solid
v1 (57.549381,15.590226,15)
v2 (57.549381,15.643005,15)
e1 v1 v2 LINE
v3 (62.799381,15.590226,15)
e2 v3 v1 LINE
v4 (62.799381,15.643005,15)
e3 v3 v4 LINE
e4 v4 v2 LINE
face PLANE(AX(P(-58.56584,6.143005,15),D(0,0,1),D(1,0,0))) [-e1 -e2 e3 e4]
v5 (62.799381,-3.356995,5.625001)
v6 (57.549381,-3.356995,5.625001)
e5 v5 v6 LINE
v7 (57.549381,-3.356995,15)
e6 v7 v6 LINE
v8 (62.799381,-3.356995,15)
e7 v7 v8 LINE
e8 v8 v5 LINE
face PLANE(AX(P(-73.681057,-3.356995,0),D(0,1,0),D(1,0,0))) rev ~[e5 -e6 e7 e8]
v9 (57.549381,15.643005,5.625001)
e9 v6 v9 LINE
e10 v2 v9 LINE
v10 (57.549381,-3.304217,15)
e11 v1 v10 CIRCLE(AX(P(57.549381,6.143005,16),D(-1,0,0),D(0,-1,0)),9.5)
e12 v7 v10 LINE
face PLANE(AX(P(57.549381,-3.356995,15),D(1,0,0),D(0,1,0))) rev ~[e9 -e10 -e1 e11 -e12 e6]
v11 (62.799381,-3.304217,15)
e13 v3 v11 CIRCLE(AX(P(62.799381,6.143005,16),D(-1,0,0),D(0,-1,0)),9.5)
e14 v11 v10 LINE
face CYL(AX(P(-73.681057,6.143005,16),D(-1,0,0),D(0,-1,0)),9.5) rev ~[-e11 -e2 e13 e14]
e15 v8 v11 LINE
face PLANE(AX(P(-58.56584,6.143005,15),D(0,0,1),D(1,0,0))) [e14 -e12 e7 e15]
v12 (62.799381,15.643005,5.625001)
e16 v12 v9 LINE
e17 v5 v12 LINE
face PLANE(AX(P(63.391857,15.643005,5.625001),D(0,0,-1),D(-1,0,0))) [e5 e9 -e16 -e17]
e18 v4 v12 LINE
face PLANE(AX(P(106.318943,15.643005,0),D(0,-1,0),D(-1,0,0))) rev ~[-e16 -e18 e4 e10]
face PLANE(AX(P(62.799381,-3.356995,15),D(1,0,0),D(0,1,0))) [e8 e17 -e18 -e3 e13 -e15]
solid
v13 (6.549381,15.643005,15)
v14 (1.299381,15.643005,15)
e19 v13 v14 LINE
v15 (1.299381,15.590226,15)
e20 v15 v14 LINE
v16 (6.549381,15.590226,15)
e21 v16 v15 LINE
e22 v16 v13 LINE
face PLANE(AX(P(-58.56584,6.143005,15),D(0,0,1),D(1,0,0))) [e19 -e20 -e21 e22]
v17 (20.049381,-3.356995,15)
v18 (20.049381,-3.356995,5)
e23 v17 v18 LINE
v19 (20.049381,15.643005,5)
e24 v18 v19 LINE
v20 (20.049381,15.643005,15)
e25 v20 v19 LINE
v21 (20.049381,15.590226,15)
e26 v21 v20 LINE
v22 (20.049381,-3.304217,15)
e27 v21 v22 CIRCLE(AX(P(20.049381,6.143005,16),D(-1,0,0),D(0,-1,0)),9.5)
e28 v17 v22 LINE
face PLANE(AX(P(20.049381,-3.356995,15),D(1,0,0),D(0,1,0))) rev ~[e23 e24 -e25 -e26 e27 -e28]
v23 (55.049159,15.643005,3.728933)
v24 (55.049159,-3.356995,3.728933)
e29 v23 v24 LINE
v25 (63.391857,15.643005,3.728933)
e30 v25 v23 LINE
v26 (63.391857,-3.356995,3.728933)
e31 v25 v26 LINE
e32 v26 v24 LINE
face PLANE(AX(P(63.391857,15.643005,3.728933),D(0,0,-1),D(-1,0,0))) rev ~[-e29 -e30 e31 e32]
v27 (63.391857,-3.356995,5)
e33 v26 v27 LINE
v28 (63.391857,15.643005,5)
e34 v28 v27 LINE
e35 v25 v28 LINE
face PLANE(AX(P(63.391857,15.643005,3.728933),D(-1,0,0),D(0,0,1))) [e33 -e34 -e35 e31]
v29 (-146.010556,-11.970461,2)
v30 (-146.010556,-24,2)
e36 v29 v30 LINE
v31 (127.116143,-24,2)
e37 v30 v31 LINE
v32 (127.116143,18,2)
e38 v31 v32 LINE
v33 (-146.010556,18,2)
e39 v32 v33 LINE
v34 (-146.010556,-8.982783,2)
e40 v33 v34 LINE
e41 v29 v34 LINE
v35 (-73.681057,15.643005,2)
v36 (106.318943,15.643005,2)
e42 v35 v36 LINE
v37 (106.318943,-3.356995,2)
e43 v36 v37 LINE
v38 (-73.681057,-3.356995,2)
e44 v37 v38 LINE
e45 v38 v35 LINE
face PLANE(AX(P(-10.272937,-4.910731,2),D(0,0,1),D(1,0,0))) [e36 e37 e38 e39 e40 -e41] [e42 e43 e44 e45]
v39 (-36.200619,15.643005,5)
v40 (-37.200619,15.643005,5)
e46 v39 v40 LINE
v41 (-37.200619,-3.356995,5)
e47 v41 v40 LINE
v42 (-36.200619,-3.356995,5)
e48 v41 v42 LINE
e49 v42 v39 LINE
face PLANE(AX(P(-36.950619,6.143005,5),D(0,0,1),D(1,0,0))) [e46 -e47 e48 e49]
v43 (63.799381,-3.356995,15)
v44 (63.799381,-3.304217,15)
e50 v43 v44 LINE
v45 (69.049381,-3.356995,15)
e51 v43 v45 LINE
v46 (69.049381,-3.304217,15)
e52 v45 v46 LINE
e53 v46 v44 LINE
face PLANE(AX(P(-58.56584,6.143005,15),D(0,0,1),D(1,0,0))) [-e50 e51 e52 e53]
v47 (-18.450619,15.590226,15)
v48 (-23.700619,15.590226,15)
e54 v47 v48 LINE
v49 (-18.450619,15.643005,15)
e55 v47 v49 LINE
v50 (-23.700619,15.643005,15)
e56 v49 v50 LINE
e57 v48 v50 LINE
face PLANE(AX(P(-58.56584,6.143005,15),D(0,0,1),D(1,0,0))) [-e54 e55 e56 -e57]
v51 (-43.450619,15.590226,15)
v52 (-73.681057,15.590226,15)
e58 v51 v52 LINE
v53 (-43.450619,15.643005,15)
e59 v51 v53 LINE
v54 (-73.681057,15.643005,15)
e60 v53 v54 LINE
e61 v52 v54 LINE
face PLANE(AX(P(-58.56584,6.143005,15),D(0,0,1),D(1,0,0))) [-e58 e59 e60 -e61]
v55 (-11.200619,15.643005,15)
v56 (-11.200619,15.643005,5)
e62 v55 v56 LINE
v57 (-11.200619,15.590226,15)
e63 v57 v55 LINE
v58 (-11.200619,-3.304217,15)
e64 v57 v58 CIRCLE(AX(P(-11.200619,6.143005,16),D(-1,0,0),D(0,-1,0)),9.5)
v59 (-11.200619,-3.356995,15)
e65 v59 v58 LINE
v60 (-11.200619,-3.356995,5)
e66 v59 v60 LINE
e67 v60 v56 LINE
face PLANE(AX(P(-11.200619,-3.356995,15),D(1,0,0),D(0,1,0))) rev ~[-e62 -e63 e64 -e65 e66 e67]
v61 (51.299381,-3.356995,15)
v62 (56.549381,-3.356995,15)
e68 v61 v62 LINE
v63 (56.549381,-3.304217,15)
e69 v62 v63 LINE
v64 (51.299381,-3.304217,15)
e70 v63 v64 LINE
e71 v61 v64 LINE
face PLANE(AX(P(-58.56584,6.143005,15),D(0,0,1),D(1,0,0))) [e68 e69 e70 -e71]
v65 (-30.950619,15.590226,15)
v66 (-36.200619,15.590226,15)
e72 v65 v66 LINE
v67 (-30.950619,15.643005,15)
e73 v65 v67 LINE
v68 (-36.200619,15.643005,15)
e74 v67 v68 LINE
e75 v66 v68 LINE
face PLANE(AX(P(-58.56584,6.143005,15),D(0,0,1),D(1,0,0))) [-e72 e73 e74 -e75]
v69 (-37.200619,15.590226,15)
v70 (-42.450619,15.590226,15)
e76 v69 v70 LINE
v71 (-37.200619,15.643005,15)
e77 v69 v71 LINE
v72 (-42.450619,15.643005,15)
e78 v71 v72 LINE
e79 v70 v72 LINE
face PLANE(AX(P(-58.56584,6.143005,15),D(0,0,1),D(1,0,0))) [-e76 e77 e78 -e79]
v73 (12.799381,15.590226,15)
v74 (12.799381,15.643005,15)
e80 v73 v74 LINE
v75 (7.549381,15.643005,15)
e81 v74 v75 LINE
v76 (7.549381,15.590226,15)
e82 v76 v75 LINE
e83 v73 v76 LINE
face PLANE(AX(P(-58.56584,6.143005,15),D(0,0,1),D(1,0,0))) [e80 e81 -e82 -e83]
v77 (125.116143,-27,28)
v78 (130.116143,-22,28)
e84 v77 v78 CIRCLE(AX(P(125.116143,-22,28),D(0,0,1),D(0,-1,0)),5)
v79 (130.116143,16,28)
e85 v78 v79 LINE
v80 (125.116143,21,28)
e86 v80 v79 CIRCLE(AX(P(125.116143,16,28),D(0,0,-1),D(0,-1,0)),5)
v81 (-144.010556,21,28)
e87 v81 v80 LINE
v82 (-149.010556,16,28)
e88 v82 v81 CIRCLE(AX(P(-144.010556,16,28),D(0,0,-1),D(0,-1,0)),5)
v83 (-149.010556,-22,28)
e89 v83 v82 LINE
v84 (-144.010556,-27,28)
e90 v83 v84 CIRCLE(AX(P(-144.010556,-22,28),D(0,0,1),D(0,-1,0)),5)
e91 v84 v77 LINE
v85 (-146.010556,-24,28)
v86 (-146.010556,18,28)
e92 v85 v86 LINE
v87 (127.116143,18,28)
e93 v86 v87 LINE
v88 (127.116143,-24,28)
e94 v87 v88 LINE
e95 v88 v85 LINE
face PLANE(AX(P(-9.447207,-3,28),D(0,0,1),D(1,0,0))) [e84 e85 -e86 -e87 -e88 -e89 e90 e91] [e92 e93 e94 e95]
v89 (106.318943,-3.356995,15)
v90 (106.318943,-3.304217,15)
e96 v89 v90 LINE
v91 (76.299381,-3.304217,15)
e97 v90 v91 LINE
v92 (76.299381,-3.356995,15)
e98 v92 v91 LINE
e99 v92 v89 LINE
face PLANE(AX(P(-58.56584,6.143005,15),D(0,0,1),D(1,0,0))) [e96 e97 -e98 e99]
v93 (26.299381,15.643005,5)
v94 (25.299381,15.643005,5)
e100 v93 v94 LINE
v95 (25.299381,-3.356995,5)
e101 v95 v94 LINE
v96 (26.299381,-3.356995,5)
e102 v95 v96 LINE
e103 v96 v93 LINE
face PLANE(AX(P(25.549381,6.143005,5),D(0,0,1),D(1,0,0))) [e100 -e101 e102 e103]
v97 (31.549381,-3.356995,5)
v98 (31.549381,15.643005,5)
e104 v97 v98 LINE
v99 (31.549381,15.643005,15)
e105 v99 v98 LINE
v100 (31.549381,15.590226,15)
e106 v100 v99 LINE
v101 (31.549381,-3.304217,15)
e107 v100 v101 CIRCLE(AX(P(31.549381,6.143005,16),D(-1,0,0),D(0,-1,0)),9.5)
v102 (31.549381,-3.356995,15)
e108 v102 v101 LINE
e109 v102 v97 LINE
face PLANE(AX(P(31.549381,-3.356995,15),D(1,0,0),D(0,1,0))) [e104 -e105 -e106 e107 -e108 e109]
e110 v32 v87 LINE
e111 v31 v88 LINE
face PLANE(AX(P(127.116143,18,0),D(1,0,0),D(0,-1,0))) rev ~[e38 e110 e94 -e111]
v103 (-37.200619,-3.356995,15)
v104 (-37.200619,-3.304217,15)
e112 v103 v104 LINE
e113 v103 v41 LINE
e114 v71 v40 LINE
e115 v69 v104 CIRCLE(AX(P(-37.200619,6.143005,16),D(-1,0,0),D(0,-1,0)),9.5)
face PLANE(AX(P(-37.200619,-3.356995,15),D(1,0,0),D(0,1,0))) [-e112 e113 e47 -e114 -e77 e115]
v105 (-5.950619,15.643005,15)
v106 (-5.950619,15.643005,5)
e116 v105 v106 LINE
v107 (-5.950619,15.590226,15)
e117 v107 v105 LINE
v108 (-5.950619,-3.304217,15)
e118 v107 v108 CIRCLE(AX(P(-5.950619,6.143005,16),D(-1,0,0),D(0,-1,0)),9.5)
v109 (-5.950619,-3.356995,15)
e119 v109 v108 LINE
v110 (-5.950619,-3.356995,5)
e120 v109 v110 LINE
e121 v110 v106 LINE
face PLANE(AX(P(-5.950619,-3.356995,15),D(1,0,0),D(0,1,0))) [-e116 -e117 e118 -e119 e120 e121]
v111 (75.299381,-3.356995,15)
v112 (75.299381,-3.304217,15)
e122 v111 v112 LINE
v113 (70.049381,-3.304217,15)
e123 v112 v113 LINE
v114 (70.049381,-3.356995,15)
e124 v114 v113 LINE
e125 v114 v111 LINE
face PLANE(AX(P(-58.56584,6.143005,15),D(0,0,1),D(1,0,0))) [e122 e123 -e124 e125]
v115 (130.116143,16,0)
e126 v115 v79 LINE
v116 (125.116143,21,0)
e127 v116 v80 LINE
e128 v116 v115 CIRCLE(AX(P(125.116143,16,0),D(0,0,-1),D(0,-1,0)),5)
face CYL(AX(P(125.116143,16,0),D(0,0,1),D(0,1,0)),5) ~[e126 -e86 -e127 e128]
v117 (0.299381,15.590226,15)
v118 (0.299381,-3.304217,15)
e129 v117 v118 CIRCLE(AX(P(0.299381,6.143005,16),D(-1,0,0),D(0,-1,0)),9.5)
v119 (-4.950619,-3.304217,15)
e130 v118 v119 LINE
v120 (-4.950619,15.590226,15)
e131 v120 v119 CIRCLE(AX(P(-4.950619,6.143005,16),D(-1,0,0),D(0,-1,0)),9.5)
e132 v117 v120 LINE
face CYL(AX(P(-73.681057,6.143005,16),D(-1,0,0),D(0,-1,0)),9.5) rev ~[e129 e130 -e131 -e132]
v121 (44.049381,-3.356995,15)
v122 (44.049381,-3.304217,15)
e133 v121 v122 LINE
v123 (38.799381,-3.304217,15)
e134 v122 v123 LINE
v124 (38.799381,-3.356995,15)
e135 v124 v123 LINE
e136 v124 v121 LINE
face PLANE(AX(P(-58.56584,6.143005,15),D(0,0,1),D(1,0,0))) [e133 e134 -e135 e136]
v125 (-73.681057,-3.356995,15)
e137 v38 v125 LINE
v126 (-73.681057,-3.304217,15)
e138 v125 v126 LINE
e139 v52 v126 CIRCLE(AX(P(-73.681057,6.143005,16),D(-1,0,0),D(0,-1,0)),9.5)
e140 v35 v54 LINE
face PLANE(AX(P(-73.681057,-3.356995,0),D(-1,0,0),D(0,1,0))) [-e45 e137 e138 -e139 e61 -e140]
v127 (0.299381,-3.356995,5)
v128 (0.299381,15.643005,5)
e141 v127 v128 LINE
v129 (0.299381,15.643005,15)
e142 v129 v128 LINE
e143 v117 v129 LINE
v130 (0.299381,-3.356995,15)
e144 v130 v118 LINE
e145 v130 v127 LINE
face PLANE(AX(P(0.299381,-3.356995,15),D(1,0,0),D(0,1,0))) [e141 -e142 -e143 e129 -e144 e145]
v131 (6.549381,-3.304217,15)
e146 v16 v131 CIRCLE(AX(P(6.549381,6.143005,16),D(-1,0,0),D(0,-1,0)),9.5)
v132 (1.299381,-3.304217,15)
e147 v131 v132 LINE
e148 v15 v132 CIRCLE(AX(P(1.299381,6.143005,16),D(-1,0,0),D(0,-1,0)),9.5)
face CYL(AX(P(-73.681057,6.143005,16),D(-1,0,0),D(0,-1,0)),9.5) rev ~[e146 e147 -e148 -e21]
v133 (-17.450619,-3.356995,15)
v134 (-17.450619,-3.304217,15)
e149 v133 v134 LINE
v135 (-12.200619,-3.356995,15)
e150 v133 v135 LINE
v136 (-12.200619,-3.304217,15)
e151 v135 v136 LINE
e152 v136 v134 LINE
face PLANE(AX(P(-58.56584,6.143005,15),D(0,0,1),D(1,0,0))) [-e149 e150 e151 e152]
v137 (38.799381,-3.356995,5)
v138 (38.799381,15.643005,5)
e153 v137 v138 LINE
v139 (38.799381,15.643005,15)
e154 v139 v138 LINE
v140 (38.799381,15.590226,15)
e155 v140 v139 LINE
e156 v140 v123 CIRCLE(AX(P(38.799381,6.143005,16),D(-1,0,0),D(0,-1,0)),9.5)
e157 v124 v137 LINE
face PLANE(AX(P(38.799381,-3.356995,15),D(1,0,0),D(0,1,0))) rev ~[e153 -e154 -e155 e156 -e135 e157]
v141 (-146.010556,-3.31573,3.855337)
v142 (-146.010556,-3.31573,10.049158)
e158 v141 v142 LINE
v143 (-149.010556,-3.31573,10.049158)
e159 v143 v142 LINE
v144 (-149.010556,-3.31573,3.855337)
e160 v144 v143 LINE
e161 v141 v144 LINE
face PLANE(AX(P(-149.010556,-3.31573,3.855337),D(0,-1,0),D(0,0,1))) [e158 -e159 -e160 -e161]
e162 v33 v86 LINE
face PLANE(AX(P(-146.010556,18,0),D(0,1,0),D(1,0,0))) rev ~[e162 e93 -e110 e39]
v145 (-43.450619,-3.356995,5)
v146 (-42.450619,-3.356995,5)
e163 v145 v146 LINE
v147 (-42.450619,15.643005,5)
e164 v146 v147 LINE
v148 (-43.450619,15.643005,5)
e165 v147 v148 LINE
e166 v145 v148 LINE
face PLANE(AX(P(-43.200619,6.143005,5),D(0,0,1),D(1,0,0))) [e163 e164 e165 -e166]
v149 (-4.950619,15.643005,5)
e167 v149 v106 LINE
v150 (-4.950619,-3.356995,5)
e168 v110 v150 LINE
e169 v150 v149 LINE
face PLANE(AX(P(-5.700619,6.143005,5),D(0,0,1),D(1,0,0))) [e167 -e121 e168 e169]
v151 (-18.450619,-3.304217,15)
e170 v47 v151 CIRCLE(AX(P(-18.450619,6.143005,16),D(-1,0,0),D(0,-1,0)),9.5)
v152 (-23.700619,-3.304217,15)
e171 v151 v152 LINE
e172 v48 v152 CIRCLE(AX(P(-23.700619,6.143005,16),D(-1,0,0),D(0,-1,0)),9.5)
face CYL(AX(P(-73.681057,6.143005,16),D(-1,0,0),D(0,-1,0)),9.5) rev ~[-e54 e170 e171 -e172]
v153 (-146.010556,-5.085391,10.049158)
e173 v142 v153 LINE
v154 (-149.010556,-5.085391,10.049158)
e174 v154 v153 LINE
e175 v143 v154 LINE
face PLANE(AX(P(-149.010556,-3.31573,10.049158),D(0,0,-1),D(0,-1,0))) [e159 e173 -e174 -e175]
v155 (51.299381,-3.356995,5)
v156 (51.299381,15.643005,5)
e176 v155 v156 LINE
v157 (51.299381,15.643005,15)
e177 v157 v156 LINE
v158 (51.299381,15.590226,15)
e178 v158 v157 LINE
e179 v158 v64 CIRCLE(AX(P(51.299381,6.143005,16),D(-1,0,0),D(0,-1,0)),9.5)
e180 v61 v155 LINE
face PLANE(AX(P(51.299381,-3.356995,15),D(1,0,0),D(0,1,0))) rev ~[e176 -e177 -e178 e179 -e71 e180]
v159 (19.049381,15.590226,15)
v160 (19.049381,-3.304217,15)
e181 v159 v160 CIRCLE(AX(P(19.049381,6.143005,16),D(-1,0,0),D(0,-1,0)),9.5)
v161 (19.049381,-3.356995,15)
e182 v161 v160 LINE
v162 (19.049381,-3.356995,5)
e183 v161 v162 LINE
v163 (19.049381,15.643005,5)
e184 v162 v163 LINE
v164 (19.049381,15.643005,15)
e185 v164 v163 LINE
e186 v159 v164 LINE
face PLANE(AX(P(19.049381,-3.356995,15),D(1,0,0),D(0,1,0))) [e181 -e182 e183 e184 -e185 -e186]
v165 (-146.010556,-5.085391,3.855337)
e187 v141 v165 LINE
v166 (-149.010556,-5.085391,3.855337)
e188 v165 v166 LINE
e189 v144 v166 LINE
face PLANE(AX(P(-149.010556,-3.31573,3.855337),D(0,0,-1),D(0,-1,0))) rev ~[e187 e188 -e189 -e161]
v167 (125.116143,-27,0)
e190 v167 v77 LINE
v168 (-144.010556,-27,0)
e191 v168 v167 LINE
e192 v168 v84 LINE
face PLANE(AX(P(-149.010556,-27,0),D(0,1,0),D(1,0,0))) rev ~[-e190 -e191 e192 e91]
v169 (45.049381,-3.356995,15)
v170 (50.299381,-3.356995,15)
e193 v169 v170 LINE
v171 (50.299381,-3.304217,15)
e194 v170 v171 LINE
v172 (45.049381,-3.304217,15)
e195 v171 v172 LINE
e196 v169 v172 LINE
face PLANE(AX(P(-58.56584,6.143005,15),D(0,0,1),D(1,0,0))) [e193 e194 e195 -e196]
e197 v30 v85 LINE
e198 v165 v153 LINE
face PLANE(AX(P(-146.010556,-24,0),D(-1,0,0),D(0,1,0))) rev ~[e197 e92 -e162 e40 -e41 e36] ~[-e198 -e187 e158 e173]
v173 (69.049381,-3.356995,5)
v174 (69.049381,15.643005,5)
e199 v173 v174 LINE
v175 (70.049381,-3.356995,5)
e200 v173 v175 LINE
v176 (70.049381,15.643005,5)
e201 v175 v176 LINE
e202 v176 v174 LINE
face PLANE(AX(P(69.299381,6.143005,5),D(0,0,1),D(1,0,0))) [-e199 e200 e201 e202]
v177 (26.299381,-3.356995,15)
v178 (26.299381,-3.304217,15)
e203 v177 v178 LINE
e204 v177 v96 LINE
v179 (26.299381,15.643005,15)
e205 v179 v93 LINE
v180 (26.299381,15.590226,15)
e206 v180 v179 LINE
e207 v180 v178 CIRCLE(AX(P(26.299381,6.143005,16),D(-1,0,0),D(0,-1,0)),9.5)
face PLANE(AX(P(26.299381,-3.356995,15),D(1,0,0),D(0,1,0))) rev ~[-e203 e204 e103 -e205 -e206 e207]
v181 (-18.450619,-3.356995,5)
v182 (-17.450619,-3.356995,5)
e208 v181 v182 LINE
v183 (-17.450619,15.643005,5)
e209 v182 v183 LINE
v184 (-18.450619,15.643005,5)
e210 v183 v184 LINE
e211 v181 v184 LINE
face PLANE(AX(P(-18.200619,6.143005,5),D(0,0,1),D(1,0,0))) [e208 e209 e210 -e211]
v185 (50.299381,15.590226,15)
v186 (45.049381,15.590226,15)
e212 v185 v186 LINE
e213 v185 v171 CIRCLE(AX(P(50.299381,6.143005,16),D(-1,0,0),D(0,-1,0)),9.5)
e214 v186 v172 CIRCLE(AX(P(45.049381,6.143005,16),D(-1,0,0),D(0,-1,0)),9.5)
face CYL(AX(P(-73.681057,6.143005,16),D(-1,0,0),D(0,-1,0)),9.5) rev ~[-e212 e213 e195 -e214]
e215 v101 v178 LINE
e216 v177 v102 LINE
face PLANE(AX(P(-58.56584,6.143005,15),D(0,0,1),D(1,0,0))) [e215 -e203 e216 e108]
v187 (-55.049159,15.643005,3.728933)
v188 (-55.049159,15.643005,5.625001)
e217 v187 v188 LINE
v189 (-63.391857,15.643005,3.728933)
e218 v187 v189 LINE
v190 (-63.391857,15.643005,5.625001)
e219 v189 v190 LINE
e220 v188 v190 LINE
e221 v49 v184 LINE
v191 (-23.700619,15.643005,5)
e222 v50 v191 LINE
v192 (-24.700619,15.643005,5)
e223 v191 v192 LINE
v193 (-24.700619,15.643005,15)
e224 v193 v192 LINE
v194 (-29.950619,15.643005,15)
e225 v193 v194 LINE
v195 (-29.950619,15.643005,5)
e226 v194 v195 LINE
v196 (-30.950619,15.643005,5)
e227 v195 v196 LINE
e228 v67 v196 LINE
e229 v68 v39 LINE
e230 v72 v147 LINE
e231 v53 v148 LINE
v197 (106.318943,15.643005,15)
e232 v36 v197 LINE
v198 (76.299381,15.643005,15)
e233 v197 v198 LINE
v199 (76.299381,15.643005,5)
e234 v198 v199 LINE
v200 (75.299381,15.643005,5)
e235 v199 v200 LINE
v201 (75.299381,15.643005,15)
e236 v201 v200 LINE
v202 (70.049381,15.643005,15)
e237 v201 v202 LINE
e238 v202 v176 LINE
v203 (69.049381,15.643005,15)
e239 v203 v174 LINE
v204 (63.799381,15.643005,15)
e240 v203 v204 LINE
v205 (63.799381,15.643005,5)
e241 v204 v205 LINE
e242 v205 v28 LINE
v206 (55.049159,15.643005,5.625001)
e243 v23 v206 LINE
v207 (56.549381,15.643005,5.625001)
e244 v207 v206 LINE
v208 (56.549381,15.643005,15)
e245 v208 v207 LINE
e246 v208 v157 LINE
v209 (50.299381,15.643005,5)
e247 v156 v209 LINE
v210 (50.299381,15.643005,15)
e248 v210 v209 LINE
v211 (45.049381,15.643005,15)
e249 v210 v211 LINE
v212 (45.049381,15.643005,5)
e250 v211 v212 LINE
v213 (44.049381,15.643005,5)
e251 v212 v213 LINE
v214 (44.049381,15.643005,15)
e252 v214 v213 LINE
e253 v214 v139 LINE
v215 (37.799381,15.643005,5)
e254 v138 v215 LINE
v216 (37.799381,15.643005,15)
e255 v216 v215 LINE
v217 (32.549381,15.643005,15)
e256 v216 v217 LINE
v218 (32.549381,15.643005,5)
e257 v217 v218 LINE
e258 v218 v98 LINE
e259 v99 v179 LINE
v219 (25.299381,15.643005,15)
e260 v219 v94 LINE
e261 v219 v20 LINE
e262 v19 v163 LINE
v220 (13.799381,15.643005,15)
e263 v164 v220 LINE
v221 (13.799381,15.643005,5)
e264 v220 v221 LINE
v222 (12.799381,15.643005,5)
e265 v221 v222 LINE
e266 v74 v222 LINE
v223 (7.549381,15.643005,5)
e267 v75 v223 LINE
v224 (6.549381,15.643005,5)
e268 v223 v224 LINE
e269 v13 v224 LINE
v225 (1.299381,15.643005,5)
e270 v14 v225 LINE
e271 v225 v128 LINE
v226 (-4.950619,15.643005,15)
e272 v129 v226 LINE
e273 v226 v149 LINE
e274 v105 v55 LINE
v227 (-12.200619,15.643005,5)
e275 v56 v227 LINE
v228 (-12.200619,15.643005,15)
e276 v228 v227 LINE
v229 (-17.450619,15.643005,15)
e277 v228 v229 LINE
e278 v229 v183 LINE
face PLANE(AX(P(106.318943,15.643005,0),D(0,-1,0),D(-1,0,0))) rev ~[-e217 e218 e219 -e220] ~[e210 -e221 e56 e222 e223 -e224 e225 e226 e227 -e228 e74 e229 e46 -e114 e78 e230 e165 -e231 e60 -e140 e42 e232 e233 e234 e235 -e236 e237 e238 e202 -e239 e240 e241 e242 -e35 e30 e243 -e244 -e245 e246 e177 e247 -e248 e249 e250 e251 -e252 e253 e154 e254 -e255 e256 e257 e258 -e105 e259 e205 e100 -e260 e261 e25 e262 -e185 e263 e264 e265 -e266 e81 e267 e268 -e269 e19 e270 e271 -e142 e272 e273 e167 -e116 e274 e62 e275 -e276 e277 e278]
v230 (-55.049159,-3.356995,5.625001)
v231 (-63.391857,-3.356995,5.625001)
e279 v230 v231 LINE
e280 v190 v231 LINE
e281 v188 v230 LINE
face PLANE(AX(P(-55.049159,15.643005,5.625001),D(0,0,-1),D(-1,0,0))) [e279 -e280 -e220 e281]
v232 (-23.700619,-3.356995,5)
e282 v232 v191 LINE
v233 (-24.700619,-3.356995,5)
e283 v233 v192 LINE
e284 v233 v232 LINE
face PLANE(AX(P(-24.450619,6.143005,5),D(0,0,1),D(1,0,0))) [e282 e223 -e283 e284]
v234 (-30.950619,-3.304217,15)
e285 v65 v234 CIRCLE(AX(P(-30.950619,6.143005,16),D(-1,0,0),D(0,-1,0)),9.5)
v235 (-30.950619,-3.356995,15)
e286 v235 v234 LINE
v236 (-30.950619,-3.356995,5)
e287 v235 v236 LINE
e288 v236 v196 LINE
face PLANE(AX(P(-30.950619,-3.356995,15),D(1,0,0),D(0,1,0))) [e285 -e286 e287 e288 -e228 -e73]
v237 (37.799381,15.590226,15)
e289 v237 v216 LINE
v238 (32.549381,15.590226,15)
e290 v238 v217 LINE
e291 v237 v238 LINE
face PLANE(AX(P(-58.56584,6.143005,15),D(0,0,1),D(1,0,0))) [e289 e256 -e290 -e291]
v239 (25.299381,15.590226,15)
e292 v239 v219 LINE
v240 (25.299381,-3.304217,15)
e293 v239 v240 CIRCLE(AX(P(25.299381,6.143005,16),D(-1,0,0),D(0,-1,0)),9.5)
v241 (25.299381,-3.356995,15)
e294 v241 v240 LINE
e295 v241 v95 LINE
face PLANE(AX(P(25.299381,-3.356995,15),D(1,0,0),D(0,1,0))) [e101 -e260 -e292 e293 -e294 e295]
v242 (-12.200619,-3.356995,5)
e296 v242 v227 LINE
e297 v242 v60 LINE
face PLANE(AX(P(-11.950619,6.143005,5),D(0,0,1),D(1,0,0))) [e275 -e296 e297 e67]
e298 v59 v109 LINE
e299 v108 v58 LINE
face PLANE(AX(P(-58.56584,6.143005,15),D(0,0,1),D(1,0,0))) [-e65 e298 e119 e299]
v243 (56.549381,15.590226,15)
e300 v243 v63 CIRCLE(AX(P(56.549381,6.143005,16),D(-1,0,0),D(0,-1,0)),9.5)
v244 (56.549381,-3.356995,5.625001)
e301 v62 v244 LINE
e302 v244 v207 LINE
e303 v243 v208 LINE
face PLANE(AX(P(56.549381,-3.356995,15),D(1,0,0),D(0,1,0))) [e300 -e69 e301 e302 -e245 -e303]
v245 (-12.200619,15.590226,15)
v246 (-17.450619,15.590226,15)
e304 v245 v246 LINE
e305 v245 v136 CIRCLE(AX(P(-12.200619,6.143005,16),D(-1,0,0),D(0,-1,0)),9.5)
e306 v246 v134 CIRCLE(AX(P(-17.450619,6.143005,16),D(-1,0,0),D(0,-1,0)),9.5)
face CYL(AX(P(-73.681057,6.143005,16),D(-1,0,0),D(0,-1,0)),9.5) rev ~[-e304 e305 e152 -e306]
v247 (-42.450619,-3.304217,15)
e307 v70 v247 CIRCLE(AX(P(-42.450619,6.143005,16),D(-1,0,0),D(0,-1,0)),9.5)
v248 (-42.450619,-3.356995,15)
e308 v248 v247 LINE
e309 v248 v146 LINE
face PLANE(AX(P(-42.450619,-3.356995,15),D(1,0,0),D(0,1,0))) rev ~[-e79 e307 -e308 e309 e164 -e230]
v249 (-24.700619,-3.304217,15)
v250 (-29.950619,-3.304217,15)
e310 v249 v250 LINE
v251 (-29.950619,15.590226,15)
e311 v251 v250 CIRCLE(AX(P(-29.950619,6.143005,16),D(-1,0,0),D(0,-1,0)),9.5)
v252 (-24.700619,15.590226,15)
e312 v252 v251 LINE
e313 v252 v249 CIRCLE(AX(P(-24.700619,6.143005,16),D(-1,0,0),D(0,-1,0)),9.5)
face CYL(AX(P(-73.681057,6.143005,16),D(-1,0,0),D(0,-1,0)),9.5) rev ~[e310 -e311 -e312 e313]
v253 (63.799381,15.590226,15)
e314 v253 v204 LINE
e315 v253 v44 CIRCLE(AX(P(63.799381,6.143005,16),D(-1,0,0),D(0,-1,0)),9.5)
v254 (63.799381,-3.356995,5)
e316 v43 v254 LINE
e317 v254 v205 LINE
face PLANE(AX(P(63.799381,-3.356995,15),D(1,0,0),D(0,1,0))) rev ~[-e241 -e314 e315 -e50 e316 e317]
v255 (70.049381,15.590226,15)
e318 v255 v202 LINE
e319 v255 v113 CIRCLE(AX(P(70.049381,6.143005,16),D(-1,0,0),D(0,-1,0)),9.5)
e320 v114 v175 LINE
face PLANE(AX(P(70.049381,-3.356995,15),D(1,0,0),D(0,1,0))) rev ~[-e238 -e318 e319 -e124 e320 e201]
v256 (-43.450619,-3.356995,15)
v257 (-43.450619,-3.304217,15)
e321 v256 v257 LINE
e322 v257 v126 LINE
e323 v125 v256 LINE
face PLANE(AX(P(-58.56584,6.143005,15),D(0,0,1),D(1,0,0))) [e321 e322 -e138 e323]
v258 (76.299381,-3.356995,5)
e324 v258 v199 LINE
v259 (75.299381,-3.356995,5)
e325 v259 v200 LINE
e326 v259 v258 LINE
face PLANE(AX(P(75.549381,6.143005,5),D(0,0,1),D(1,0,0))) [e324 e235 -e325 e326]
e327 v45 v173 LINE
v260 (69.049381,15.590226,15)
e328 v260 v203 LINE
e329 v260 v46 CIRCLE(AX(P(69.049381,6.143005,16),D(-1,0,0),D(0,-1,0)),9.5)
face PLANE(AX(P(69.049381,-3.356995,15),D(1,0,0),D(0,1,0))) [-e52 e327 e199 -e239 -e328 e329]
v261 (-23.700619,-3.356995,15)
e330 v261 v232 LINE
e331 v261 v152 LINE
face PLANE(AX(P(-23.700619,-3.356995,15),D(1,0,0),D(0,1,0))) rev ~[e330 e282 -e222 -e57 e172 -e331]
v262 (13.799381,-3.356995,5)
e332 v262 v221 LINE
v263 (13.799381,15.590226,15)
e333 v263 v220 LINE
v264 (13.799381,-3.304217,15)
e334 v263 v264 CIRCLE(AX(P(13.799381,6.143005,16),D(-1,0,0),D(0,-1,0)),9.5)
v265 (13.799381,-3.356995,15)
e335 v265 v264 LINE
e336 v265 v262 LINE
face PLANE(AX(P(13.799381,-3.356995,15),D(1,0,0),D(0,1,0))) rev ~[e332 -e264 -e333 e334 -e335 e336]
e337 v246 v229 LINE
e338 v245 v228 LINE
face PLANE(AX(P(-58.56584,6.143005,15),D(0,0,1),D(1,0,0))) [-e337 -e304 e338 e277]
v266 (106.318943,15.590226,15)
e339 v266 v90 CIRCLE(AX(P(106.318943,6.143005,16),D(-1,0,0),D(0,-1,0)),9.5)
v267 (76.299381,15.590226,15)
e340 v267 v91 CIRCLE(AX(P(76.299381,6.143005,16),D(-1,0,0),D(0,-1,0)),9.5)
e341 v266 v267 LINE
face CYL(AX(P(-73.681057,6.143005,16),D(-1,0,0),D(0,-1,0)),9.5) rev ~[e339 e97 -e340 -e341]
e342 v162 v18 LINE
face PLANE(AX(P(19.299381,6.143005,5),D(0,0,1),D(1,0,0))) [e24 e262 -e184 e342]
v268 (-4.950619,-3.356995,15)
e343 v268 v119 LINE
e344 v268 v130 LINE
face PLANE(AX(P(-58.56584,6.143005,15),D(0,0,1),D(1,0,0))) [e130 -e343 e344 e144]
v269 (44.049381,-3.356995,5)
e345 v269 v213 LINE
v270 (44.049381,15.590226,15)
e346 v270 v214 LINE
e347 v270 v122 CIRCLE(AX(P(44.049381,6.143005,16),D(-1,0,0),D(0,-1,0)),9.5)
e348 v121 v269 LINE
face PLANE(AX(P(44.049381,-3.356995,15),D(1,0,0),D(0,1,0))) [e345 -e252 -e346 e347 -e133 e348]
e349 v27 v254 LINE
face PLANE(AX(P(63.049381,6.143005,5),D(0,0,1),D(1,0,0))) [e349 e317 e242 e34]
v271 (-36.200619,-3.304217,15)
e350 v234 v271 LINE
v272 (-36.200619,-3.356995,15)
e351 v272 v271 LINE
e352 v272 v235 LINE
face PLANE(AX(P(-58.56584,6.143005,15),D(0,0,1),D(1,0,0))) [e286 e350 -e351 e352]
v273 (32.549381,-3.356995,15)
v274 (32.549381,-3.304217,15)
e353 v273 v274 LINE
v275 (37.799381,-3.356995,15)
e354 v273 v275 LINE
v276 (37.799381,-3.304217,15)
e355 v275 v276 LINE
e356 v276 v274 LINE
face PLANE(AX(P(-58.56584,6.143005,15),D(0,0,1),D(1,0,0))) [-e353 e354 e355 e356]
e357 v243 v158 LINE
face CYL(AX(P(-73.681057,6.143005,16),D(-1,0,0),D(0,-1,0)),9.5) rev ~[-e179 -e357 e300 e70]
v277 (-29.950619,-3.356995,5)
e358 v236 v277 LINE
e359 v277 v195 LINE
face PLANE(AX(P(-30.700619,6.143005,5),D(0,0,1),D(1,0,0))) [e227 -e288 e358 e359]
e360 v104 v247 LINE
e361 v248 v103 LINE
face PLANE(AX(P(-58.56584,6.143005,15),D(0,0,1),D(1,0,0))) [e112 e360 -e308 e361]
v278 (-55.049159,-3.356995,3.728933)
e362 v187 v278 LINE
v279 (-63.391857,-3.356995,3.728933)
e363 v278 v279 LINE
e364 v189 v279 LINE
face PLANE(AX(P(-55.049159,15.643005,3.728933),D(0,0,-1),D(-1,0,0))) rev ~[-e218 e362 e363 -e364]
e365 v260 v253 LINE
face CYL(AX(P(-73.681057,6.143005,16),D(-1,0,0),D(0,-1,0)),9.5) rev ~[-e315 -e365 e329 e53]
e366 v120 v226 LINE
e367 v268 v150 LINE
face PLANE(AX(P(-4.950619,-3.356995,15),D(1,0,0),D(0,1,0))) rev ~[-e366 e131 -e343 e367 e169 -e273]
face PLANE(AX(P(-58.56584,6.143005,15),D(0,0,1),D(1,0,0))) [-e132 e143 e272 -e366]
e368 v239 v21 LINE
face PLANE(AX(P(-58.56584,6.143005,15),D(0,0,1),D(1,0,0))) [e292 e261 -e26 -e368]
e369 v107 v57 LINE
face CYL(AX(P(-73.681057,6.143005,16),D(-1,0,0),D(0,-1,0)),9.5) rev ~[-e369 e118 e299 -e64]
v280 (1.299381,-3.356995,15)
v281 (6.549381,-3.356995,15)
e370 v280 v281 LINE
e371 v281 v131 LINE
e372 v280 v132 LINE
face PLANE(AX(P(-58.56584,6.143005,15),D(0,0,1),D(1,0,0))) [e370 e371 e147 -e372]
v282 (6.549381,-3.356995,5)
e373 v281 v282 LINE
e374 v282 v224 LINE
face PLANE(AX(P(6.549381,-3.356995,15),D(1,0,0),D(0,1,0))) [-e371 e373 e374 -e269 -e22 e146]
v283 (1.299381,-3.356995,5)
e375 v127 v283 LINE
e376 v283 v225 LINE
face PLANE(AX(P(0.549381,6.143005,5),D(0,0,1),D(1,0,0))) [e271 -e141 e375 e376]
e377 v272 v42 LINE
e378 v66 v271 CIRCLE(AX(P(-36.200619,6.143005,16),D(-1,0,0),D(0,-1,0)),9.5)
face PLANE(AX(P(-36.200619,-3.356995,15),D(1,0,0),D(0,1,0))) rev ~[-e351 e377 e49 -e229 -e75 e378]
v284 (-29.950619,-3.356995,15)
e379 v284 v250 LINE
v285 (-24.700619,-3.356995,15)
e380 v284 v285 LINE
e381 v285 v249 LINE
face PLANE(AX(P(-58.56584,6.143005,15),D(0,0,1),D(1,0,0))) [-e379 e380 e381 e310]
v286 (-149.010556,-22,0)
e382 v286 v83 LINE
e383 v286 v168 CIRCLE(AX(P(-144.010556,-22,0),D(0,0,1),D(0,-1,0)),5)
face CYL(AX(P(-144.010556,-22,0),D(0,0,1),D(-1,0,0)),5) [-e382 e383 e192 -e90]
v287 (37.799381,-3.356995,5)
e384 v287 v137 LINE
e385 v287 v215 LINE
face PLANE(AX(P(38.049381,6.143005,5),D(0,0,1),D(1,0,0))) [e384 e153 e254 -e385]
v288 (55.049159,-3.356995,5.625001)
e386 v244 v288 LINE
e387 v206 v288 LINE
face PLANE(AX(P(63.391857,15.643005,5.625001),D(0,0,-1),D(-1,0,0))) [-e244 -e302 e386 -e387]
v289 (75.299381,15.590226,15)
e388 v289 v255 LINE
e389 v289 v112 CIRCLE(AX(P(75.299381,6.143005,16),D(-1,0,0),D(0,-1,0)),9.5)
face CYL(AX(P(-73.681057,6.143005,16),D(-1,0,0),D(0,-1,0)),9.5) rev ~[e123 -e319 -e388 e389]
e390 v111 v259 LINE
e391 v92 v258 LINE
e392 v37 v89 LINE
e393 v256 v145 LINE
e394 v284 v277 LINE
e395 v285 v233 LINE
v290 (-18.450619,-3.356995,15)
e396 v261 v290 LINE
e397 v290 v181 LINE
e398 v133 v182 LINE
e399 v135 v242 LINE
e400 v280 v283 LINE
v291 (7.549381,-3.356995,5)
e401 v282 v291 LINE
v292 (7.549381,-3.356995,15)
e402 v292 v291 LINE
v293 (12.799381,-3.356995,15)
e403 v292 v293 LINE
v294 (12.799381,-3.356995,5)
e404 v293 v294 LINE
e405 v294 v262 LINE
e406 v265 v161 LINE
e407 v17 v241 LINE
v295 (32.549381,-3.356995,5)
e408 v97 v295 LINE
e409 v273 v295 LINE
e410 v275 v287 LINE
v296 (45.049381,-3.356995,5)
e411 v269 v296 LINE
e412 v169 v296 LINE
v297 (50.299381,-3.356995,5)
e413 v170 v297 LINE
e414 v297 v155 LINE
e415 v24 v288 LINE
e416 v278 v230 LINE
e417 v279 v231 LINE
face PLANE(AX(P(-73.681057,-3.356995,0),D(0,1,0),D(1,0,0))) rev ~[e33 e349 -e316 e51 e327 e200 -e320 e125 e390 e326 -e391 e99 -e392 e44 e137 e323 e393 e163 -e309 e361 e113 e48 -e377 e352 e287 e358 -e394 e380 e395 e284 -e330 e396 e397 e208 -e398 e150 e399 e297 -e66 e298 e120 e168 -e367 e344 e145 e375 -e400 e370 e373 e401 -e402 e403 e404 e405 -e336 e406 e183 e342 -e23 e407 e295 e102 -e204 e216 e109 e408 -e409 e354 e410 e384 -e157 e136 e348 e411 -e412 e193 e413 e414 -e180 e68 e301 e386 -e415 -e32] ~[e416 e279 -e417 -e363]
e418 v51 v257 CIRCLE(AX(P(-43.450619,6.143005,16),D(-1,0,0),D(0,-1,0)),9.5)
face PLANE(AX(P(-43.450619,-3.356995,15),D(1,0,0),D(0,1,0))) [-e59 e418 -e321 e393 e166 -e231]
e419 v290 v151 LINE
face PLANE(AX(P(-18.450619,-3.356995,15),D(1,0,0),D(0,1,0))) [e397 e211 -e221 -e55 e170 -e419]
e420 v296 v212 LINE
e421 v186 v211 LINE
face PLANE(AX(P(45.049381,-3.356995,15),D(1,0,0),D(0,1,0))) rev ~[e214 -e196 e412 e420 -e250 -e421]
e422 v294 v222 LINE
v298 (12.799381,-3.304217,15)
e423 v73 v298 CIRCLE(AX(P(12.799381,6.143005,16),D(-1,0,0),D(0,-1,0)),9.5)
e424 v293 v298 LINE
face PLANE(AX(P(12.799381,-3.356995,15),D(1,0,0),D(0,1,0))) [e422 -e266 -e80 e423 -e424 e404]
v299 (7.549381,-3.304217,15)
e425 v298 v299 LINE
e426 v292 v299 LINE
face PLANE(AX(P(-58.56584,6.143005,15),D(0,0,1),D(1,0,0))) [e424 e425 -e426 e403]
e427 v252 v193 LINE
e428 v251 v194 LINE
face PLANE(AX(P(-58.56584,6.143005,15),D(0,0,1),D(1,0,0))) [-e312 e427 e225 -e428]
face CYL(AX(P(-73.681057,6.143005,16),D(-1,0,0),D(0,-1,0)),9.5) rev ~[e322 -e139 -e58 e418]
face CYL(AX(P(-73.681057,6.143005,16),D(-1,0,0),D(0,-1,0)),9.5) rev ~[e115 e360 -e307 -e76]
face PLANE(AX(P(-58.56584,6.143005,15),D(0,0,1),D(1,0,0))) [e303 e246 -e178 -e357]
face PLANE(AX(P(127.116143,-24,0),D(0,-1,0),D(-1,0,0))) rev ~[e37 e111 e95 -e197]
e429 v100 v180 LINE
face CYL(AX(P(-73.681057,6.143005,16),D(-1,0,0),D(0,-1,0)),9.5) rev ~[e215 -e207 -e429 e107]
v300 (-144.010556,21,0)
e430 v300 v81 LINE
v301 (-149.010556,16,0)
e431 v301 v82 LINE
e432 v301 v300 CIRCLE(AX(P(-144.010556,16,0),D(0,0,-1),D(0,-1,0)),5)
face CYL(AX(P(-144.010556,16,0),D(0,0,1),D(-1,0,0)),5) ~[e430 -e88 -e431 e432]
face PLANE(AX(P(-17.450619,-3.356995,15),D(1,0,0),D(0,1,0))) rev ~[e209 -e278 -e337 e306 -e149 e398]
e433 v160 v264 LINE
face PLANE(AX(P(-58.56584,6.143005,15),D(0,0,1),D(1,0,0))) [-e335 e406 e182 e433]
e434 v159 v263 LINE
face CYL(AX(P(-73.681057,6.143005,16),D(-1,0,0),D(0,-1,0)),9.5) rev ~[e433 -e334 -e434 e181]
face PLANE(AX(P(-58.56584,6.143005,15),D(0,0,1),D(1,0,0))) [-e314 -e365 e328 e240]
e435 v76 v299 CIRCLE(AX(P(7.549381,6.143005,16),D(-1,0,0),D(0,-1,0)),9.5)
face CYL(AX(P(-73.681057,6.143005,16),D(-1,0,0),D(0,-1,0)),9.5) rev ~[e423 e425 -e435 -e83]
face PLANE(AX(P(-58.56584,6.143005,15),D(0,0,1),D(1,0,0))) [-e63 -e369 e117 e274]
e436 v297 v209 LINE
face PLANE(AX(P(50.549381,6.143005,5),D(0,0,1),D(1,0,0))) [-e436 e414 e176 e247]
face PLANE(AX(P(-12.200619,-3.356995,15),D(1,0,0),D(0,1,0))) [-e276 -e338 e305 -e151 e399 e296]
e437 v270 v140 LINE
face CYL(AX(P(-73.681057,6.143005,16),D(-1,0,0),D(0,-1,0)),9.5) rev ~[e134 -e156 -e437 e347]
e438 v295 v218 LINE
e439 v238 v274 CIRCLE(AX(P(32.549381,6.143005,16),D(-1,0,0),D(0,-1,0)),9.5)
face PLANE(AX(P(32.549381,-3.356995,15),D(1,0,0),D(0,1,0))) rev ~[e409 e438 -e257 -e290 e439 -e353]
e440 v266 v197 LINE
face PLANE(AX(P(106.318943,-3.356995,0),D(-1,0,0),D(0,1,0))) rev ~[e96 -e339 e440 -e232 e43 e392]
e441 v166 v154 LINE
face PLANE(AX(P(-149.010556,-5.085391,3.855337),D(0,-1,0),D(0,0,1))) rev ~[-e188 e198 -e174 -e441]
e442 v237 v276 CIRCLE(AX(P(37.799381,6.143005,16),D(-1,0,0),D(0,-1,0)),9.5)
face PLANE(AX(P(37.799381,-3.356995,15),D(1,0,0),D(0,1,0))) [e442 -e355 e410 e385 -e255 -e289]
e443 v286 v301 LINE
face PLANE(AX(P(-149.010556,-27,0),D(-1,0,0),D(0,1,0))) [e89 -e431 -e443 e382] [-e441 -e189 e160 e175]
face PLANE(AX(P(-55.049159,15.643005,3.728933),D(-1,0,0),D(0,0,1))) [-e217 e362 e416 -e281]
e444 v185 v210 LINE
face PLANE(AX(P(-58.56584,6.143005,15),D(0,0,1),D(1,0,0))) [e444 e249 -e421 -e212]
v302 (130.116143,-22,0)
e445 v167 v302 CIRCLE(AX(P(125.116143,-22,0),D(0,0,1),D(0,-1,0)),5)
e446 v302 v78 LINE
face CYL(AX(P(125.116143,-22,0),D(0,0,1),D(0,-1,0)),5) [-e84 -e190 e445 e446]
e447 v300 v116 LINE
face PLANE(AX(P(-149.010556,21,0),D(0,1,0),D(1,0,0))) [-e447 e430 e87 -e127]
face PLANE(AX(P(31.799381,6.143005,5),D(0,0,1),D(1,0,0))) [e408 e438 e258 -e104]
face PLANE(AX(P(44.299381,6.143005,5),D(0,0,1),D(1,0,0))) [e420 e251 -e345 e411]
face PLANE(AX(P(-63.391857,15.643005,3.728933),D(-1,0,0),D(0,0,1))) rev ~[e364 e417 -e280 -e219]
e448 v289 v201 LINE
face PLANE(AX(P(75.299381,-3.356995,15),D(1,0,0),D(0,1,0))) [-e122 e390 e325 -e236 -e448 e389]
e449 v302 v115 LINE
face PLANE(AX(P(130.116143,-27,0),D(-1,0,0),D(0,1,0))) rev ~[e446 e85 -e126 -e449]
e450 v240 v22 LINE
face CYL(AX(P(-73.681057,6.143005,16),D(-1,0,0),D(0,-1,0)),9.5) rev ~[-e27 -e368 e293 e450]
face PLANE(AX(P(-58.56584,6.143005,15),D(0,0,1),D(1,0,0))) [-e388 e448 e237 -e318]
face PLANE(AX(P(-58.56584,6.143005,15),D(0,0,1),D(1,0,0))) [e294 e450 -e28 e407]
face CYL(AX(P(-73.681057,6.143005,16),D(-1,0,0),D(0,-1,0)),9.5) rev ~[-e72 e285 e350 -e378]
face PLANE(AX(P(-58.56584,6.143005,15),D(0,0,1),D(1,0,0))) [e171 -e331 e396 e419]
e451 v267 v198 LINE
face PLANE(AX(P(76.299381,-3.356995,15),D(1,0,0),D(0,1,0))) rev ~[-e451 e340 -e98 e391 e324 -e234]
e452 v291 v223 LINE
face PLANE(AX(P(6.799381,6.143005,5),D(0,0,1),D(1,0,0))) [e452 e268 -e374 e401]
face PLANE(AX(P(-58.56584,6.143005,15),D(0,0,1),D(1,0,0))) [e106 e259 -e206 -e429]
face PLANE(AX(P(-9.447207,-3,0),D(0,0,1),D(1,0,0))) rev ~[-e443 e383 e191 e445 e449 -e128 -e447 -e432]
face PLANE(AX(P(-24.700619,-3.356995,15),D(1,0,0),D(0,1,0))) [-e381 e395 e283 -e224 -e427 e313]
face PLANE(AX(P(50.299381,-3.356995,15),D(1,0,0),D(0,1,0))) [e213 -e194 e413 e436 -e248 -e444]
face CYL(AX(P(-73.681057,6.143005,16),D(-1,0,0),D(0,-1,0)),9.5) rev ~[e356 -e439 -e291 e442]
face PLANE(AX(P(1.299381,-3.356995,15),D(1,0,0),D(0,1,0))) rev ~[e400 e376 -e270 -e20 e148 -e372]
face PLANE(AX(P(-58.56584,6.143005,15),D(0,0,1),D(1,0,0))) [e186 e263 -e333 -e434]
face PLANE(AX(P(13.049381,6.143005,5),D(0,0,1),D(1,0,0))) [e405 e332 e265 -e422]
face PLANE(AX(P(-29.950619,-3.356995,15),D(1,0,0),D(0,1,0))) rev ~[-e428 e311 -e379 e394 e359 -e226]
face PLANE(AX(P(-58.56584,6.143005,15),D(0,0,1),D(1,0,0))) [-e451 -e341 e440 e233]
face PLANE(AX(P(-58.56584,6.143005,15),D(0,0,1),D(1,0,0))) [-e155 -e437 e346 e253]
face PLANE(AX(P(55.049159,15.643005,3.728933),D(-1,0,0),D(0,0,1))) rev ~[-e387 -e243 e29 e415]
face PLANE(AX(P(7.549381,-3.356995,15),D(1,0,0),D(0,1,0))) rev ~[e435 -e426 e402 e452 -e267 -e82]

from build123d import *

# Parameters (mm, degrees)
F0_W      = 30.2304342687
F0_H      = 19
F0_W_2    = 0.5
F0_W_3    = 5.25
F0_W_4    = 30.0195657313
F1_DEPTH  = 15
F0_W_5    = 6.6043436527
F0_H_2    = 2.9876781628
F0_W_6    = 51
F0_H_3    = 18
F0_W_7    = 6.3103074431
F3_DEPTH  = 2
F4_R      = 9.5
F5_DEPTH  = 180
F2_W      = 0.5
F2_H      = 19
F7_DEPTH  = 10
F6_W      = 8.3426982164
F6_H      = 1.8960679881
F8_DEPTH  = 19
F0_W_8    = 279.1266992456
F0_H_4    = 48
F9_DEPTH  = 28
F10_W     = 1.7696609721
F10_H     = 6.1938203871
F11_DEPTH = 5
F12_R     = 5


# Not quite as in the source:
# - a feature names something its author has since deleted; it is built from what else it names


with BuildPart() as f1:
    # F0 (on Top) → F1 (new body)
    with BuildSketch(Plane.XY):
        with Locations((-58.5658399016, 6.1430045813)):
            Rectangle(F0_W, F0_H)
        with Locations((-43.2006227672, 6.1430045813)):
            Rectangle(F0_W_2, F0_H)
        with Locations((-42.7006227672, 6.1430045813)):
            Rectangle(F0_W_2, F0_H)
        with Locations((-39.8256227672, 6.1430045813)):
            Rectangle(F0_W_3, F0_H)
        with Locations((-36.9506227672, 6.1430045813)):
            Rectangle(F0_W_2, F0_H)
        with Locations((-36.4506227672, 6.1430045813)):
            Rectangle(F0_W_2, F0_H)
        with Locations((-33.5756227672, 6.1430045813)):
            Rectangle(F0_W_3, F0_H)
        with Locations((-30.7006227672, 6.1430045813)):
            Rectangle(F0_W_2, F0_H)
        with Locations((-30.2006227672, 6.1430045813)):
            Rectangle(F0_W_2, F0_H)
        with Locations((-27.3256227672, 6.1430045813)):
            Rectangle(F0_W_3, F0_H)
        with Locations((-24.4506227672, 6.1430045813)):
            Rectangle(F0_W_2, F0_H)
        with Locations((-23.9506227672, 6.1430045813)):
            Rectangle(F0_W_2, F0_H)
        with Locations((-21.0756227672, 6.1430045813)):
            Rectangle(F0_W_3, F0_H)
        with Locations((-18.2006227672, 6.1430045813)):
            Rectangle(F0_W_2, F0_H)
        with Locations((-17.7006227672, 6.1430045813)):
            Rectangle(F0_W_2, F0_H)
        with Locations((-14.8256227672, 6.1430045813)):
            Rectangle(F0_W_3, F0_H)
        with Locations((-11.9506227672, 6.1430045813)):
            Rectangle(F0_W_2, F0_H)
        with Locations((-11.4506227672, 6.1430045813)):
            Rectangle(F0_W_2, F0_H)
        with Locations((-8.5756227672, 6.1430045813)):
            Rectangle(F0_W_3, F0_H)
        with Locations((-5.7006227672, 6.1430045813)):
            Rectangle(F0_W_2, F0_H)
        with Locations((-5.2006227672, 6.1430045813)):
            Rectangle(F0_W_2, F0_H)
        with Locations((-2.3256227672, 6.1430045813)):
            Rectangle(F0_W_3, F0_H)
        with Locations((0.5493772328, 6.1430045813)):
            Rectangle(F0_W_2, F0_H)
        with Locations((1.0493772328, 6.1430045813)):
            Rectangle(F0_W_2, F0_H)
        with Locations((3.9243772328, 6.1430045813)):
            Rectangle(F0_W_3, F0_H)
        with Locations((6.7993772328, 6.1430045813)):
            Rectangle(F0_W_2, F0_H)
        with Locations((7.2993772328, 6.1430045813)):
            Rectangle(F0_W_2, F0_H)
        with Locations((10.1743772328, 6.1430045813)):
            Rectangle(F0_W_3, F0_H)
        with Locations((13.0493772328, 6.1430045813)):
            Rectangle(F0_W_2, F0_H)
        with Locations((13.5493772328, 6.1430045813)):
            Rectangle(F0_W_2, F0_H)
        with Locations((16.4243772328, 6.1430045813)):
            Rectangle(F0_W_3, F0_H)
        with Locations((19.2993772328, 6.1430045813)):
            Rectangle(F0_W_2, F0_H)
        with Locations((19.7993772328, 6.1430045813)):
            Rectangle(F0_W_2, F0_H)
        with Locations((22.6743772328, 6.1430045813)):
            Rectangle(F0_W_3, F0_H)
        with Locations((25.5493772328, 6.1430045813)):
            Rectangle(F0_W_2, F0_H)
        with Locations((26.0493772328, 6.1430045813)):
            Rectangle(F0_W_2, F0_H)
        with Locations((28.9243772328, 6.1430045813)):
            Rectangle(F0_W_3, F0_H)
        with Locations((31.7993772328, 6.1430045813)):
            Rectangle(F0_W_2, F0_H)
        with Locations((32.2993772328, 6.1430045813)):
            Rectangle(F0_W_2, F0_H)
        with Locations((35.1743772328, 6.1430045813)):
            Rectangle(F0_W_3, F0_H)
        with Locations((38.0493772328, 6.1430045813)):
            Rectangle(F0_W_2, F0_H)
        with Locations((38.5493772328, 6.1430045813)):
            Rectangle(F0_W_2, F0_H)
        with Locations((41.4243772328, 6.1430045813)):
            Rectangle(F0_W_3, F0_H)
        with Locations((44.2993772328, 6.1430045813)):
            Rectangle(F0_W_2, F0_H)
        with Locations((44.7993772328, 6.1430045813)):
            Rectangle(F0_W_2, F0_H)
        with Locations((47.6743772328, 6.1430045813)):
            Rectangle(F0_W_3, F0_H)
        with Locations((50.5493772328, 6.1430045813)):
            Rectangle(F0_W_2, F0_H)
        with Locations((51.0493772328, 6.1430045813)):
            Rectangle(F0_W_2, F0_H)
        with Locations((53.9243772328, 6.1430045813)):
            Rectangle(F0_W_3, F0_H)
        with Locations((56.7993772328, 6.1430045813)):
            Rectangle(F0_W_2, F0_H)
        with Locations((57.2993772328, 6.1430045813)):
            Rectangle(F0_W_2, F0_H)
        with Locations((60.1743772328, 6.1430045813)):
            Rectangle(F0_W_3, F0_H)
        with Locations((63.0493772328, 6.1430045813)):
            Rectangle(F0_W_2, F0_H)
        with Locations((63.5493772328, 6.1430045813)):
            Rectangle(F0_W_2, F0_H)
        with Locations((66.4243772328, 6.1430045813)):
            Rectangle(F0_W_3, F0_H)
        with Locations((69.2993772328, 6.1430045813)):
            Rectangle(F0_W_2, F0_H)
        with Locations((69.7993772328, 6.1430045813)):
            Rectangle(F0_W_2, F0_H)
        with Locations((72.6743772328, 6.1430045813)):
            Rectangle(F0_W_3, F0_H)
        with Locations((75.5493772328, 6.1430045813)):
            Rectangle(F0_W_2, F0_H)
        with Locations((76.0493772328, 6.1430045813)):
            Rectangle(F0_W_2, F0_H)
        with Locations((91.3091600984, 6.1430045813)):
            Rectangle(F0_W_4, F0_H)
    extrude(amount=F1_DEPTH)

    # F0 (on Top) → F3 (join)
    with BuildSketch(Plane.XY):
        Polygon((-146.0105562806, -24), (127.116142965, -24), (127.116142965, 18), (-92.0105562806, 18), (-92.0105562806, -3), (-146.0105562806, -3), (-146.0105562806, -8.9827831835), (-139.7002488375, -8.9827831835), (-139.7002488375, -11.9704613462), (-146.0105562806, -11.9704613462), align=None)
        with Locations((-95.1995551586, -10.7911149971)):
            Rectangle(F0_W_5, F0_H_2, mode=Mode.SUBTRACT)
        Polygon((-73.6810570359, -3.3569954187), (-73.6810570359, 15.6430045813), (-43.4506227672, 15.6430045813), (-42.9506227672, 15.6430045813), (-42.4506227672, 15.6430045813), (-37.2006227672, 15.6430045813), (-36.7006227672, 15.6430045813), (-36.2006227672, 15.6430045813), (-30.9506227672, 15.6430045813), (-30.4506227672, 15.6430045813), (-29.9506227672, 15.6430045813), (-24.7006227672, 15.6430045813), (-24.2006227672, 15.6430045813), (-23.7006227672, 15.6430045813), (-18.4506227672, 15.6430045813), (-17.9506227672, 15.6430045813), (-17.4506227672, 15.6430045813), (-12.2006227672, 15.6430045813), (-11.7006227672, 15.6430045813), (-11.2006227672, 15.6430045813), (-5.9506227672, 15.6430045813), (-5.4506227672, 15.6430045813), (-4.9506227672, 15.6430045813), (0.2993772328, 15.6430045813), (0.7993772328, 15.6430045813), (1.2993772328, 15.6430045813), (6.5493772328, 15.6430045813), (7.0493772328, 15.6430045813), (7.5493772328, 15.6430045813), (12.7993772328, 15.6430045813), (13.2993772328, 15.6430045813), (13.7993772328, 15.6430045813), (19.0493772328, 15.6430045813), (19.5493772328, 15.6430045813), (20.0493772328, 15.6430045813), (25.2993772328, 15.6430045813), (25.7993772328, 15.6430045813), (26.2993772328, 15.6430045813), (31.5493772328, 15.6430045813), (32.0493772328, 15.6430045813), (32.5493772328, 15.6430045813), (37.7993772328, 15.6430045813), (38.2993772328, 15.6430045813), (38.7993772328, 15.6430045813), (44.0493772328, 15.6430045813), (44.5493772328, 15.6430045813), (45.0493772328, 15.6430045813), (50.2993772328, 15.6430045813), (50.7993772328, 15.6430045813), (51.2993772328, 15.6430045813), (56.5493772328, 15.6430045813), (57.0493772328, 15.6430045813), (57.5493772328, 15.6430045813), (62.7993772328, 15.6430045813), (63.2993772328, 15.6430045813), (63.7993772328, 15.6430045813), (69.0493772328, 15.6430045813), (69.5493772328, 15.6430045813), (70.0493772328, 15.6430045813), (75.2993772328, 15.6430045813), (75.7993772328, 15.6430045813), (76.2993772328, 15.6430045813), (106.3189429641, 15.6430045813), (106.3189429641, -3.3569954187), (76.2993772328, -3.3569954187), (75.7993772328, -3.3569954187), (75.2993772328, -3.3569954187), (70.0493772328, -3.3569954187), (69.5493772328, -3.3569954187), (69.0493772328, -3.3569954187), (63.7993772328, -3.3569954187), (63.2993772328, -3.3569954187), (62.7993772328, -3.3569954187), (57.5493772328, -3.3569954187), (57.0493772328, -3.3569954187), (56.5493772328, -3.3569954187), (51.2993772328, -3.3569954187), (50.7993772328, -3.3569954187), (50.2993772328, -3.3569954187), (45.0493772328, -3.3569954187), (44.5493772328, -3.3569954187), (44.0493772328, -3.3569954187), (38.7993772328, -3.3569954187), (38.2993772328, -3.3569954187), (37.7993772328, -3.3569954187), (32.5493772328, -3.3569954187), (32.0493772328, -3.3569954187), (31.5493772328, -3.3569954187), (26.2993772328, -3.3569954187), (25.7993772328, -3.3569954187), (25.2993772328, -3.3569954187), (20.0493772328, -3.3569954187), (19.5493772328, -3.3569954187), (19.0493772328, -3.3569954187), (13.7993772328, -3.3569954187), (13.2993772328, -3.3569954187), (12.7993772328, -3.3569954187), (7.5493772328, -3.3569954187), (7.0493772328, -3.3569954187), (6.5493772328, -3.3569954187), (1.2993772328, -3.3569954187), (0.7993772328, -3.3569954187), (0.2993772328, -3.3569954187), (-4.9506227672, -3.3569954187), (-5.4506227672, -3.3569954187), (-5.9506227672, -3.3569954187), (-11.2006227672, -3.3569954187), (-11.7006227672, -3.3569954187), (-12.2006227672, -3.3569954187), (-17.4506227672, -3.3569954187), (-17.9506227672, -3.3569954187), (-18.4506227672, -3.3569954187), (-23.7006227672, -3.3569954187), (-24.2006227672, -3.3569954187), (-24.7006227672, -3.3569954187), (-29.9506227672, -3.3569954187), (-30.4506227672, -3.3569954187), (-30.9506227672, -3.3569954187), (-36.2006227672, -3.3569954187), (-36.7006227672, -3.3569954187), (-37.2006227672, -3.3569954187), (-42.4506227672, -3.3569954187), (-42.9506227672, -3.3569954187), (-43.4506227672, -3.3569954187), align=None, mode=Mode.SUBTRACT)
        with Locations((-120.5105562806, 9)):
            Rectangle(F0_W_6, F0_H_3)
        Polygon((-92.0105562806, -3), (-92.0105562806, 18), (-95.0105562806, 18), (-95.0105562806, 0), (-146.0105562806, 0), (-146.0105562806, -3), align=None)
        with Locations((-142.855402559, -10.4766222648)):
            Rectangle(F0_W_7, F0_H_2)
        with Locations((-95.1995551586, -10.7911149971)):
            Rectangle(F0_W_5, F0_H_2)
    extrude(amount=F3_DEPTH)

    # F4 (on face) → F5 (cut)
    with BuildSketch(Plane(origin=(-73.6810570359, 0, 0), x_dir=(0, -1, 0), z_dir=(-1, 0, 0))):
        with Locations((-6.1430045813, 16)):
            Circle(F4_R)
    extrude(amount=-F5_DEPTH, mode=Mode.SUBTRACT)

    # F2 (on face) → F7 (cut)
    with BuildSketch(Plane.XY.offset(15)):
        with Locations((-43.2006190121, 6.1430045813)):
            Rectangle(F2_W, F2_H)
        with Locations((-42.7006190121, 6.1430045813)):
            Rectangle(F2_W, F2_H)
        with Locations((-36.9506190121, 6.1430045813)):
            Rectangle(F2_W, F2_H)
        with Locations((-36.4506190121, 6.1430045813)):
            Rectangle(F2_W, F2_H)
        with Locations((-30.7006190121, 6.1430045813)):
            Rectangle(F2_W, F2_H)
        with Locations((-30.2006190121, 6.1430045813)):
            Rectangle(F2_W, F2_H)
        with Locations((-24.4506190121, 6.1430045813)):
            Rectangle(F2_W, F2_H)
        with Locations((-23.9506190121, 6.1430045813)):
            Rectangle(F2_W, F2_H)
        with Locations((-18.2006190121, 6.1430045813)):
            Rectangle(F2_W, F2_H)
        with Locations((-17.7006190121, 6.1430045813)):
            Rectangle(F2_W, F2_H)
        with Locations((-11.9506190121, 6.1430045813)):
            Rectangle(F2_W, F2_H)
        with Locations((-11.4506190121, 6.1430045813)):
            Rectangle(F2_W, F2_H)
        with Locations((-5.7006190121, 6.1430045813)):
            Rectangle(F2_W, F2_H)
        with Locations((-5.2006190121, 6.1430045813)):
            Rectangle(F2_W, F2_H)
        with Locations((0.5493809879, 6.1430045813)):
            Rectangle(F2_W, F2_H)
        with Locations((1.0493809879, 6.1430045813)):
            Rectangle(F2_W, F2_H)
        with Locations((6.7993809879, 6.1430045813)):
            Rectangle(F2_W, F2_H)
        with Locations((7.2993809879, 6.1430045813)):
            Rectangle(F2_W, F2_H)
        with Locations((13.0493809879, 6.1430045813)):
            Rectangle(F2_W, F2_H)
        with Locations((13.5493809879, 6.1430045813)):
            Rectangle(F2_W, F2_H)
        with Locations((19.2993809879, 6.1430045813)):
            Rectangle(F2_W, F2_H)
        with Locations((19.7993809879, 6.1430045813)):
            Rectangle(F2_W, F2_H)
        with Locations((25.5493809879, 6.1430045813)):
            Rectangle(F2_W, F2_H)
        with Locations((26.0493809879, 6.1430045813)):
            Rectangle(F2_W, F2_H)
        with Locations((31.7993809879, 6.1430045813)):
            Rectangle(F2_W, F2_H)
        with Locations((32.2993809879, 6.1430045813)):
            Rectangle(F2_W, F2_H)
        with Locations((38.0493809879, 6.1430045813)):
            Rectangle(F2_W, F2_H)
        with Locations((38.5493809879, 6.1430045813)):
            Rectangle(F2_W, F2_H)
        with Locations((44.2993809879, 6.1430045813)):
            Rectangle(F2_W, F2_H)
        with Locations((44.7993809879, 6.1430045813)):
            Rectangle(F2_W, F2_H)
        with Locations((50.5493809879, 6.1430045813)):
            Rectangle(F2_W, F2_H)
        with Locations((51.0493809879, 6.1430045813)):
            Rectangle(F2_W, F2_H)
        with Locations((56.7993809879, 6.1430045813)):
            Rectangle(F2_W, F2_H)
        with Locations((57.2993809879, 6.1430045813)):
            Rectangle(F2_W, F2_H)
        with Locations((63.0493809879, 6.1430045813)):
            Rectangle(F2_W, F2_H)
        with Locations((63.5493809879, 6.1430045813)):
            Rectangle(F2_W, F2_H)
        with Locations((69.2993809879, 6.1430045813)):
            Rectangle(F2_W, F2_H)
        with Locations((69.7993809879, 6.1430045813)):
            Rectangle(F2_W, F2_H)
        with Locations((75.5493809879, 6.1430045813)):
            Rectangle(F2_W, F2_H)
        with Locations((76.0493809879, 6.1430045813)):
            Rectangle(F2_W, F2_H)
    extrude(amount=-F7_DEPTH, mode=Mode.SUBTRACT)

    # F6 (on face) → F8 (cut)
    with BuildSketch(Plane(origin=(0, 15.6430045813, 0), x_dir=(-1, 0, 0), z_dir=(0, 1, 0))):
        with Locations((-59.220507741, 4.6769666951)):
            Rectangle(F6_W, F6_H)
        with Locations((59.220507741, 4.6769666951)):
            Rectangle(F6_W, F6_H)
    extrude(amount=-F8_DEPTH, mode=Mode.SUBTRACT)

    # F0 (on Top) → F9 (join)
    with BuildSketch(Plane.XY):
        with Locations((-9.4472066578, -3)):
            Rectangle(F0_W_8, F0_H_4)
        Polygon((127.116142965, 18), (127.116142965, -24), (-146.0105562806, -24), (-146.0105562806, -11.9704613462), (-146.0105562806, -8.9827831835), (-146.0105562806, -3), (-146.0105562806, 0), (-146.0105562806, 18), (-95.0105562806, 18), (-92.0105562806, 18), align=None, mode=Mode.SUBTRACT)
    extrude(amount=F9_DEPTH)

    # F10 (on face) → F11 (cut, symmetric)
    with BuildSketch(Plane(origin=(-149.0105562806, 0, 0), x_dir=(0, -1, 0), z_dir=(-1, 0, 0))):
        with Locations((4.2005600408, 6.9522475824)):
            Rectangle(F10_W, F10_H)
    extrude(amount=F11_DEPTH, both=True, mode=Mode.SUBTRACT)

    # F12
    f12_edges = [f1.edges().sort_by_distance(p)[0] for p in [
        (-149.010556, 21, 14),
        (130.116143, 21, 14),
        (-149.010556, -27, 14),
        (130.116143, -27, 14),
    ]]
    fillet(f12_edges, radius=F12_R)


solid = f1.part
